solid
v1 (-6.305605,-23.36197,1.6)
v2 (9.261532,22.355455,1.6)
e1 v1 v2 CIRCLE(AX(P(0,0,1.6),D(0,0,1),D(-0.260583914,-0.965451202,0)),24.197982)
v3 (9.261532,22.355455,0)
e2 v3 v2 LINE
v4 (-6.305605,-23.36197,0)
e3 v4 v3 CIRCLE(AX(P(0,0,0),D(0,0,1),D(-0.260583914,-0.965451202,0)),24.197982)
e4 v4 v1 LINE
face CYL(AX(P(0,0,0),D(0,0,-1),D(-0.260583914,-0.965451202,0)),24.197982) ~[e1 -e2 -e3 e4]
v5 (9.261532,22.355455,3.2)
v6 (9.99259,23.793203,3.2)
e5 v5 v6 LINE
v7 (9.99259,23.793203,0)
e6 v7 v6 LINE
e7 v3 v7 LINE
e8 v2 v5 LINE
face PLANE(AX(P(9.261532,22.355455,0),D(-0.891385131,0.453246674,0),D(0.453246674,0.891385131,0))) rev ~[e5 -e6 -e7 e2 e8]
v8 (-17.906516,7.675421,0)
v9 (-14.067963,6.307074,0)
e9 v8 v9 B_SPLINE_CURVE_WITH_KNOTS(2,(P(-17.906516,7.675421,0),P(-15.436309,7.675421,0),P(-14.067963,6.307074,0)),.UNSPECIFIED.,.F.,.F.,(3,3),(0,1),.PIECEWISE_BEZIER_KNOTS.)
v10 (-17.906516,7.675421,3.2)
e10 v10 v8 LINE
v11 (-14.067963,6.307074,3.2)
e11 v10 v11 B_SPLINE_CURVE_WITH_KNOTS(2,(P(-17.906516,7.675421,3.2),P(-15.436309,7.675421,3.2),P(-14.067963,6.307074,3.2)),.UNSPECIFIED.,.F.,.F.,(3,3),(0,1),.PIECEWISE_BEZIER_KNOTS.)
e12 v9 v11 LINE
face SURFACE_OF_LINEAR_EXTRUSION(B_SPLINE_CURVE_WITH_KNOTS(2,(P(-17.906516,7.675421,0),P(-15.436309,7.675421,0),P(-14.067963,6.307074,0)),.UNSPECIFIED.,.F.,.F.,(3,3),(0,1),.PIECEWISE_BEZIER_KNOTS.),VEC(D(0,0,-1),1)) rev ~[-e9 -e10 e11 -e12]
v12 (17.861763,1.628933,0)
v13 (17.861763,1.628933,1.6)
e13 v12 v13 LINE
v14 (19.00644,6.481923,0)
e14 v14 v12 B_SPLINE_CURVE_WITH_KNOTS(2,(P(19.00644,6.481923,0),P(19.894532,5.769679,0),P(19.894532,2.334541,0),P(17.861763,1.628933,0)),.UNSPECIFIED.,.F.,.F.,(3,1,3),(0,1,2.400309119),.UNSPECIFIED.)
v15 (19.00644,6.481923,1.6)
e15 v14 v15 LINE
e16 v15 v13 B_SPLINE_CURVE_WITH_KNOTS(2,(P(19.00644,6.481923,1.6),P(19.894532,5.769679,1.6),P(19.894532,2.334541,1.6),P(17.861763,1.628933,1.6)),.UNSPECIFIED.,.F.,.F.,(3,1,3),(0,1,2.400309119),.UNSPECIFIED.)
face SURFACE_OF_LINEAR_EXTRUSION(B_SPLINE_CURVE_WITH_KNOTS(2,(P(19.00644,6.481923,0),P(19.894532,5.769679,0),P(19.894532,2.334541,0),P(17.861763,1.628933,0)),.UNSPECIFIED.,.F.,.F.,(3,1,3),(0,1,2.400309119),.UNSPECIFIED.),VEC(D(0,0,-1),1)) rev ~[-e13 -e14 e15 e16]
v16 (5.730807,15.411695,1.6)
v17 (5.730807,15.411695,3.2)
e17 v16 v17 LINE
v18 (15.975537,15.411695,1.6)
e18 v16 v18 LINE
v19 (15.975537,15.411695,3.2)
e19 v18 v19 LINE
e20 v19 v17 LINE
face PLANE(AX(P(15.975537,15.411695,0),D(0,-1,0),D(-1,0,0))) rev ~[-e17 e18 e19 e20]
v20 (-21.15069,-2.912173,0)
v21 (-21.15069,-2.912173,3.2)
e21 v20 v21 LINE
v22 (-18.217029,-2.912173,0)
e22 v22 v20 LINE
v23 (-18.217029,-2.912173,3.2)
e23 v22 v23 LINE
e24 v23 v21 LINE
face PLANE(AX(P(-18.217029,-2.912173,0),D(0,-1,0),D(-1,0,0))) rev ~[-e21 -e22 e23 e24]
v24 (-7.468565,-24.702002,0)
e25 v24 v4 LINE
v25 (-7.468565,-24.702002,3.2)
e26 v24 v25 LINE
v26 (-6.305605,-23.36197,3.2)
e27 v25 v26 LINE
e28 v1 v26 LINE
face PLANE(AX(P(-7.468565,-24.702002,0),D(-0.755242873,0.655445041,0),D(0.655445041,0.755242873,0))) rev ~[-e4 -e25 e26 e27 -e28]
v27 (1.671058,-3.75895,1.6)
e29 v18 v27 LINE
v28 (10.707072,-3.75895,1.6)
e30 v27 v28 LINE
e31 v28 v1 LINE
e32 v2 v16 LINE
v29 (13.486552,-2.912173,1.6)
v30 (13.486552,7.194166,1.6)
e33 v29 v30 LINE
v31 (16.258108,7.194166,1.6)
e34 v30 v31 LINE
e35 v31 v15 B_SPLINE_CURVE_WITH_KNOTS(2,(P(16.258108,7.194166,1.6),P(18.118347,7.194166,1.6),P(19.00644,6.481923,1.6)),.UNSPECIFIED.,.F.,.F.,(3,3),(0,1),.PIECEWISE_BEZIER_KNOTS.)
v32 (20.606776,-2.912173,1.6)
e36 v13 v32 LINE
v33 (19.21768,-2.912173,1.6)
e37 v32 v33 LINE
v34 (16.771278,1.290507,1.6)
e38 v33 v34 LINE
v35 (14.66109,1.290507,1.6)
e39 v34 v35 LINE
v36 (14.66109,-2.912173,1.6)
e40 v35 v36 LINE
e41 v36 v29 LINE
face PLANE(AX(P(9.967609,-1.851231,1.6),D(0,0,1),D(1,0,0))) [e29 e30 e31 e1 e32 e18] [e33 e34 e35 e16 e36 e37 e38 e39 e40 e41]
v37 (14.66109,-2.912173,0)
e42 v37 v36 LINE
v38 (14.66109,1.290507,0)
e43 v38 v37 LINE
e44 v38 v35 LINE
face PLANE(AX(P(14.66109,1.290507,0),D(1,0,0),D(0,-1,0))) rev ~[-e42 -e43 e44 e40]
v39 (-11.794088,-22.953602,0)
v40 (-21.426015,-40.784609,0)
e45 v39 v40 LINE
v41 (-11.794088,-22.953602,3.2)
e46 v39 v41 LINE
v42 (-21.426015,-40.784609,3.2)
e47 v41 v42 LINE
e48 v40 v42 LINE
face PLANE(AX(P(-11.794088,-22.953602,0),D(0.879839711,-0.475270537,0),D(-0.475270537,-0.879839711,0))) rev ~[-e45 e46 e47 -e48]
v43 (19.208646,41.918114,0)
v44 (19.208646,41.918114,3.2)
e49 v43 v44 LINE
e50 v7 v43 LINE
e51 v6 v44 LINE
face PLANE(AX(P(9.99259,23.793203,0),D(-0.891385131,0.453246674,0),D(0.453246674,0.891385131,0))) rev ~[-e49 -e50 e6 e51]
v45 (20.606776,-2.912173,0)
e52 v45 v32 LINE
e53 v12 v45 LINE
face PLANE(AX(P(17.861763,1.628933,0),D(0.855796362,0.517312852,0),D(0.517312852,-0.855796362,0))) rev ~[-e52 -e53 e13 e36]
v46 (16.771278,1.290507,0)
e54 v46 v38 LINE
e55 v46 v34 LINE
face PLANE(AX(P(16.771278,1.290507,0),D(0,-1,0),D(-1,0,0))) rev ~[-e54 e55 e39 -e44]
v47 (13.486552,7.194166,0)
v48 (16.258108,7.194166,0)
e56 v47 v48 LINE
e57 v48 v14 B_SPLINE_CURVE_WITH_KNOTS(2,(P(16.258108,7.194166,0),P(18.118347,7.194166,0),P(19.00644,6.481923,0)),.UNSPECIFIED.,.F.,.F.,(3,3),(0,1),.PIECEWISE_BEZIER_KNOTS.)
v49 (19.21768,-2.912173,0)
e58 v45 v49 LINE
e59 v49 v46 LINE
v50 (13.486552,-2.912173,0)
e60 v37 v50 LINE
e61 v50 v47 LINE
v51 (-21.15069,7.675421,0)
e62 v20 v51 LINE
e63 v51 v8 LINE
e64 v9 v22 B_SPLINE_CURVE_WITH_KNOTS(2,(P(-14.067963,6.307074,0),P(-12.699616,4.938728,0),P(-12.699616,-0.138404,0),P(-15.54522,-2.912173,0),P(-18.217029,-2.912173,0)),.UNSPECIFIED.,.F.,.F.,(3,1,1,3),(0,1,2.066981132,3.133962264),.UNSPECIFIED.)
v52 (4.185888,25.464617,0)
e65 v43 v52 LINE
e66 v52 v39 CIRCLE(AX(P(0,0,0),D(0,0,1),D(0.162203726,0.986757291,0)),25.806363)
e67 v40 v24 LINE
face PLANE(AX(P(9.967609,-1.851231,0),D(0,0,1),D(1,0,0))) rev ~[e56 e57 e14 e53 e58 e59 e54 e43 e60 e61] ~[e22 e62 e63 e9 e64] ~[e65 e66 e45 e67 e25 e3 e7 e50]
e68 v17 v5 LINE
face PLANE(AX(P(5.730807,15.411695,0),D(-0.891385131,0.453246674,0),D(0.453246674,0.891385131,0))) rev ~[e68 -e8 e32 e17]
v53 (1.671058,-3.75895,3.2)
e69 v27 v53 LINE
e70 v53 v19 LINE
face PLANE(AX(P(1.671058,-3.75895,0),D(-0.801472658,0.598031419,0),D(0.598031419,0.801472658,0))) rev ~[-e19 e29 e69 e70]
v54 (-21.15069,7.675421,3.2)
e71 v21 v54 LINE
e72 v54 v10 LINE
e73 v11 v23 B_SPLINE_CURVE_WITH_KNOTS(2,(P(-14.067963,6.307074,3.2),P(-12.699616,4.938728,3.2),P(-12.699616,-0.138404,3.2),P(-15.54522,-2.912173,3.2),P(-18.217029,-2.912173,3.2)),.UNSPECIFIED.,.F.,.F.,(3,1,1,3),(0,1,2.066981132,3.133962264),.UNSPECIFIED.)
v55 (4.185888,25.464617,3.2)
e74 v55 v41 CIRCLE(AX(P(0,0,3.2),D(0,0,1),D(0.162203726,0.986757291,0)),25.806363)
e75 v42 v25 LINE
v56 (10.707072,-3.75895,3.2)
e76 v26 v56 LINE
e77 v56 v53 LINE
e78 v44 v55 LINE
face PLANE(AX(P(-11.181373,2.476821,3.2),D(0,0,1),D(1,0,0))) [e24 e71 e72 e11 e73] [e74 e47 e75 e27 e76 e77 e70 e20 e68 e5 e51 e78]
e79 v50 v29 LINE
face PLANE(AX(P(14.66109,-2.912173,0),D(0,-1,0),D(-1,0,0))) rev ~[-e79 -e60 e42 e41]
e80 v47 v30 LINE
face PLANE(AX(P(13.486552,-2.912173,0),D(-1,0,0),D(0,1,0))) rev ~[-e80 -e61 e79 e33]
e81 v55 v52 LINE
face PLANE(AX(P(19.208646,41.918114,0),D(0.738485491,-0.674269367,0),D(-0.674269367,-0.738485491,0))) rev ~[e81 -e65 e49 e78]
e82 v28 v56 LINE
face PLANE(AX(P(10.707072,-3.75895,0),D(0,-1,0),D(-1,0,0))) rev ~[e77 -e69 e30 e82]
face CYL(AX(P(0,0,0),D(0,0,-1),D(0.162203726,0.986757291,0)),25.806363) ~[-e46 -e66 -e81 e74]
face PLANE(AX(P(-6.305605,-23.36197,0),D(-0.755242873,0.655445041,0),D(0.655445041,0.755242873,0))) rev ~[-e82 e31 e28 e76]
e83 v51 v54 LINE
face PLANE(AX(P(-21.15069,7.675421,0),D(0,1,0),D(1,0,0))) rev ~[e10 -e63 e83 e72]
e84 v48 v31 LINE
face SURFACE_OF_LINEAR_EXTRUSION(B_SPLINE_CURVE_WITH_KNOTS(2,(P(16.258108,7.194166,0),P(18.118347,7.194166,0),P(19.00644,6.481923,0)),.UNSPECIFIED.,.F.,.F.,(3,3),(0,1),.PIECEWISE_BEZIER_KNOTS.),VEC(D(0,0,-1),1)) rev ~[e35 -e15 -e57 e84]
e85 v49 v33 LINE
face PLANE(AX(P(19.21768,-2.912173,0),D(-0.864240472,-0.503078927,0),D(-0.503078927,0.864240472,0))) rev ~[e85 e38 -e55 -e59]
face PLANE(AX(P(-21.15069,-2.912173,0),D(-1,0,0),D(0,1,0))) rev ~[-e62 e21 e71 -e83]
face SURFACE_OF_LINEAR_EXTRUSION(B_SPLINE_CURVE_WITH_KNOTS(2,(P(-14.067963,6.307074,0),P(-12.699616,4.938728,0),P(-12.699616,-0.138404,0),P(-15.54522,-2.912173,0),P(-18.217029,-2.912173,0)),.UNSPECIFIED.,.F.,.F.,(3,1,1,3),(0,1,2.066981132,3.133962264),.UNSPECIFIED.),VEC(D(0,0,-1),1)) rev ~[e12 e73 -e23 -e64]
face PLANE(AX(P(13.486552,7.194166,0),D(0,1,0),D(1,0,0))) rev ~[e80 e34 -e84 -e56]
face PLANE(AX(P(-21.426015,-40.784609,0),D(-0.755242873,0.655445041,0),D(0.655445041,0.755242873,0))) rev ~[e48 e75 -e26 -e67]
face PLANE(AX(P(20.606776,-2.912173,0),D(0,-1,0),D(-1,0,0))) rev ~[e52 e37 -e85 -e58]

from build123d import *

# Parameters (mm, degrees)
F1_DEPTH = 3.2
F2_DEPTH = 1.6
F3_DEPTH = 2.5


# Not quite as in the source:
# - a feature names something its author has since deleted; it is built from what else it names


with BuildPart() as f1:
    # F0 (on Top) → F1 (new body)
    with BuildSketch(Plane.XY):
        with BuildLine():
            Line((-12.0286401361, 7.7058477327), (2.8731075212, 24.026809333))
            ThreePointArc((2.8731075212, 24.026809333), (-23.1446184854, 7.061795007), (-11.0294978873, -21.5381635686))
            Line((-11.0294978873, -21.5381635686), (-4.3697794008, -9.2094279826))
            Line((-4.3697794008, -9.2094279826), (-18.230907619, -9.2094279826))
            Line((-18.230907619, -9.2094279826), (-2.0674222615, 7.7058477327))
            Line((-2.0674222615, 7.7058477327), (-12.0286401361, 7.7058477327))
        make_face()
        with BuildLine():
            add(Edge.make_bspline(
                [(-14.0679626526, 6.3070743063), (-12.6996164354, 4.9387280892), (-12.6996164354, 2.4824249728)],
                knots=[0, 0, 0, 1, 1, 1], degree=2))
            add(Edge.make_bspline(
                [(-12.6996164354, 2.4824249728), (-12.6996164354, -0.138404107), (-14.1224184292, -1.5252884609)],
                knots=[0, 0, 0, 1, 1, 1], degree=2))
            add(Edge.make_bspline(
                [(-14.1224184292, -1.5252884609), (-15.545220423, -2.9121728148), (-18.2170293788, -2.9121728148)],
                knots=[0, 0, 0, 1, 1, 1], degree=2))
            Line((-18.2170293788, -2.9121728148), (-21.1506895159, -2.9121728148))
            Line((-21.1506895159, -2.9121728148), (-21.1506895159, 7.6754205235))
            Line((-21.1506895159, 7.6754205235), (-17.9065155886, 7.6754205235))
            add(Edge.make_bspline(
                [(-17.9065155886, 7.6754205235), (-15.4363088697, 7.6754205235), (-14.0679626526, 6.3070743063)],
                knots=[0, 0, 0, 1, 1, 1], degree=2))
        make_face(mode=Mode.SUBTRACT)
        with BuildLine():
            ThreePointArc((-11.0294978873, -21.5381635686), (-23.1446184854, 7.061795007), (2.8731075212, 24.026809333))
            Line((2.8731075212, 24.026809333), (4.1858882241, 25.464616759))
            ThreePointArc((4.1858882241, 25.464616759), (-24.5061657926, 8.0880285022), (-11.7940875977, -22.9536024329))
            Line((-11.7940875977, -22.9536024329), (-11.0294978873, -21.5381635686))
        make_face()
        Polygon((4.1858882241, 25.464616759), (2.8731075212, 24.026809333), (-12.0286401361, 7.7058477327), (-2.0674222615, 7.7058477327), (-18.230907619, -9.2094279826), (-4.3697794008, -9.2094279826), (-11.0294978873, -21.5381635686), (-11.7940875977, -22.9536024329), (-21.4260146022, -40.7846085727), (-7.468564605, -24.7020021385), (-6.3056047528, -23.3619704275), (10.7070716166, -3.7589499261), (1.6710584512, -3.7589499261), (15.9755367786, 15.4116954654), (5.7308066454, 15.4116954654), (9.2615315623, 22.3554545173), (9.9925901152, 23.7932030147), (19.2086462315, 41.9181135037), align=None)
    extrude(amount=F1_DEPTH)

    # F0 (on Top) → F2 (join)
    with BuildSketch(Plane.XY):
        with BuildLine():
            ThreePointArc((-6.3056047528, -23.3619704275), (22.9064425811, -7.7998206282), (9.2615315623, 22.3554545173))
            Line((9.2615315623, 22.3554545173), (5.7308066454, 15.4116954654))
            Line((5.7308066454, 15.4116954654), (15.9755367786, 15.4116954654))
            Line((15.9755367786, 15.4116954654), (1.6710584512, -3.7589499261))
            Line((1.6710584512, -3.7589499261), (10.7070716166, -3.7589499261))
            Line((10.7070716166, -3.7589499261), (-6.3056047528, -23.3619704275))
        make_face()
        with BuildLine():
            Line((16.7712777882, 1.29050713), (14.6610901855, 1.29050713))
            Line((14.6610901855, 1.29050713), (14.6610901855, -2.912172582))
            Line((14.6610901855, -2.912172582), (13.4865518028, -2.912172582))
            Line((13.4865518028, -2.912172582), (13.4865518028, 7.1941661569))
            Line((13.4865518028, 7.1941661569), (16.258108476, 7.1941661569))
            add(Edge.make_bspline(
                [(16.258108476, 7.1941661569), (18.1183472327, 7.1941661569), (19.0064398139, 6.4819225426)],
                knots=[0, 0, 0, 1, 1, 1], degree=2))
            add(Edge.make_bspline(
                [(19.0064398139, 6.4819225426), (19.8945323952, 5.7696789282), (19.8945323952, 4.3385558895)],
                knots=[0, 0, 0, 1, 1, 1], degree=2))
            add(Edge.make_bspline(
                [(19.8945323952, 4.3385558895), (19.8945323952, 2.3345412479), (17.8617625766, 1.6289334436)],
                knots=[0, 0, 0, 1, 1, 1], degree=2))
            Line((17.8617625766, 1.6289334436), (20.6067760095, -2.912172582))
            Line((20.6067760095, -2.912172582), (19.2176797679, -2.912172582))
            Line((19.2176797679, -2.912172582), (16.7712777882, 1.29050713))
        make_face(mode=Mode.SUBTRACT)
        with BuildLine():
            Line((-12.0286401361, 7.7058477327), (2.8731075212, 24.026809333))
            ThreePointArc((2.8731075212, 24.026809333), (-23.1446184854, 7.061795007), (-11.0294978873, -21.5381635686))
            Line((-11.0294978873, -21.5381635686), (-4.3697794008, -9.2094279826))
            Line((-4.3697794008, -9.2094279826), (-18.230907619, -9.2094279826))
            Line((-18.230907619, -9.2094279826), (-2.0674222615, 7.7058477327))
            Line((-2.0674222615, 7.7058477327), (-12.0286401361, 7.7058477327))
        make_face()
        with BuildLine():
            add(Edge.make_bspline(
                [(-14.0679626526, 6.3070743063), (-12.6996164354, 4.9387280892), (-12.6996164354, 2.4824249728)],
                knots=[0, 0, 0, 1, 1, 1], degree=2))
            add(Edge.make_bspline(
                [(-12.6996164354, 2.4824249728), (-12.6996164354, -0.138404107), (-14.1224184292, -1.5252884609)],
                knots=[0, 0, 0, 1, 1, 1], degree=2))
            add(Edge.make_bspline(
                [(-14.1224184292, -1.5252884609), (-15.545220423, -2.9121728148), (-18.2170293788, -2.9121728148)],
                knots=[0, 0, 0, 1, 1, 1], degree=2))
            Line((-18.2170293788, -2.9121728148), (-21.1506895159, -2.9121728148))
            Line((-21.1506895159, -2.9121728148), (-21.1506895159, 7.6754205235))
            Line((-21.1506895159, 7.6754205235), (-17.9065155886, 7.6754205235))
            add(Edge.make_bspline(
                [(-17.9065155886, 7.6754205235), (-15.4363088697, 7.6754205235), (-14.0679626526, 6.3070743063)],
                knots=[0, 0, 0, 1, 1, 1], degree=2))
        make_face(mode=Mode.SUBTRACT)
    extrude(amount=F2_DEPTH)

    # F0 (on Top) → F3 (join)
    with BuildSketch(Plane.XY):
        with BuildLine():
            ThreePointArc((-11.0294978873, -21.5381635686), (-23.1446184854, 7.061795007), (2.8731075212, 24.026809333))
            Line((2.8731075212, 24.026809333), (4.1858882241, 25.464616759))
            ThreePointArc((4.1858882241, 25.464616759), (-24.5061657926, 8.0880285022), (-11.7940875977, -22.9536024329))
            Line((-11.7940875977, -22.9536024329), (-11.0294978873, -21.5381635686))
        make_face()
    extrude(amount=F3_DEPTH)


solid = f1.part
